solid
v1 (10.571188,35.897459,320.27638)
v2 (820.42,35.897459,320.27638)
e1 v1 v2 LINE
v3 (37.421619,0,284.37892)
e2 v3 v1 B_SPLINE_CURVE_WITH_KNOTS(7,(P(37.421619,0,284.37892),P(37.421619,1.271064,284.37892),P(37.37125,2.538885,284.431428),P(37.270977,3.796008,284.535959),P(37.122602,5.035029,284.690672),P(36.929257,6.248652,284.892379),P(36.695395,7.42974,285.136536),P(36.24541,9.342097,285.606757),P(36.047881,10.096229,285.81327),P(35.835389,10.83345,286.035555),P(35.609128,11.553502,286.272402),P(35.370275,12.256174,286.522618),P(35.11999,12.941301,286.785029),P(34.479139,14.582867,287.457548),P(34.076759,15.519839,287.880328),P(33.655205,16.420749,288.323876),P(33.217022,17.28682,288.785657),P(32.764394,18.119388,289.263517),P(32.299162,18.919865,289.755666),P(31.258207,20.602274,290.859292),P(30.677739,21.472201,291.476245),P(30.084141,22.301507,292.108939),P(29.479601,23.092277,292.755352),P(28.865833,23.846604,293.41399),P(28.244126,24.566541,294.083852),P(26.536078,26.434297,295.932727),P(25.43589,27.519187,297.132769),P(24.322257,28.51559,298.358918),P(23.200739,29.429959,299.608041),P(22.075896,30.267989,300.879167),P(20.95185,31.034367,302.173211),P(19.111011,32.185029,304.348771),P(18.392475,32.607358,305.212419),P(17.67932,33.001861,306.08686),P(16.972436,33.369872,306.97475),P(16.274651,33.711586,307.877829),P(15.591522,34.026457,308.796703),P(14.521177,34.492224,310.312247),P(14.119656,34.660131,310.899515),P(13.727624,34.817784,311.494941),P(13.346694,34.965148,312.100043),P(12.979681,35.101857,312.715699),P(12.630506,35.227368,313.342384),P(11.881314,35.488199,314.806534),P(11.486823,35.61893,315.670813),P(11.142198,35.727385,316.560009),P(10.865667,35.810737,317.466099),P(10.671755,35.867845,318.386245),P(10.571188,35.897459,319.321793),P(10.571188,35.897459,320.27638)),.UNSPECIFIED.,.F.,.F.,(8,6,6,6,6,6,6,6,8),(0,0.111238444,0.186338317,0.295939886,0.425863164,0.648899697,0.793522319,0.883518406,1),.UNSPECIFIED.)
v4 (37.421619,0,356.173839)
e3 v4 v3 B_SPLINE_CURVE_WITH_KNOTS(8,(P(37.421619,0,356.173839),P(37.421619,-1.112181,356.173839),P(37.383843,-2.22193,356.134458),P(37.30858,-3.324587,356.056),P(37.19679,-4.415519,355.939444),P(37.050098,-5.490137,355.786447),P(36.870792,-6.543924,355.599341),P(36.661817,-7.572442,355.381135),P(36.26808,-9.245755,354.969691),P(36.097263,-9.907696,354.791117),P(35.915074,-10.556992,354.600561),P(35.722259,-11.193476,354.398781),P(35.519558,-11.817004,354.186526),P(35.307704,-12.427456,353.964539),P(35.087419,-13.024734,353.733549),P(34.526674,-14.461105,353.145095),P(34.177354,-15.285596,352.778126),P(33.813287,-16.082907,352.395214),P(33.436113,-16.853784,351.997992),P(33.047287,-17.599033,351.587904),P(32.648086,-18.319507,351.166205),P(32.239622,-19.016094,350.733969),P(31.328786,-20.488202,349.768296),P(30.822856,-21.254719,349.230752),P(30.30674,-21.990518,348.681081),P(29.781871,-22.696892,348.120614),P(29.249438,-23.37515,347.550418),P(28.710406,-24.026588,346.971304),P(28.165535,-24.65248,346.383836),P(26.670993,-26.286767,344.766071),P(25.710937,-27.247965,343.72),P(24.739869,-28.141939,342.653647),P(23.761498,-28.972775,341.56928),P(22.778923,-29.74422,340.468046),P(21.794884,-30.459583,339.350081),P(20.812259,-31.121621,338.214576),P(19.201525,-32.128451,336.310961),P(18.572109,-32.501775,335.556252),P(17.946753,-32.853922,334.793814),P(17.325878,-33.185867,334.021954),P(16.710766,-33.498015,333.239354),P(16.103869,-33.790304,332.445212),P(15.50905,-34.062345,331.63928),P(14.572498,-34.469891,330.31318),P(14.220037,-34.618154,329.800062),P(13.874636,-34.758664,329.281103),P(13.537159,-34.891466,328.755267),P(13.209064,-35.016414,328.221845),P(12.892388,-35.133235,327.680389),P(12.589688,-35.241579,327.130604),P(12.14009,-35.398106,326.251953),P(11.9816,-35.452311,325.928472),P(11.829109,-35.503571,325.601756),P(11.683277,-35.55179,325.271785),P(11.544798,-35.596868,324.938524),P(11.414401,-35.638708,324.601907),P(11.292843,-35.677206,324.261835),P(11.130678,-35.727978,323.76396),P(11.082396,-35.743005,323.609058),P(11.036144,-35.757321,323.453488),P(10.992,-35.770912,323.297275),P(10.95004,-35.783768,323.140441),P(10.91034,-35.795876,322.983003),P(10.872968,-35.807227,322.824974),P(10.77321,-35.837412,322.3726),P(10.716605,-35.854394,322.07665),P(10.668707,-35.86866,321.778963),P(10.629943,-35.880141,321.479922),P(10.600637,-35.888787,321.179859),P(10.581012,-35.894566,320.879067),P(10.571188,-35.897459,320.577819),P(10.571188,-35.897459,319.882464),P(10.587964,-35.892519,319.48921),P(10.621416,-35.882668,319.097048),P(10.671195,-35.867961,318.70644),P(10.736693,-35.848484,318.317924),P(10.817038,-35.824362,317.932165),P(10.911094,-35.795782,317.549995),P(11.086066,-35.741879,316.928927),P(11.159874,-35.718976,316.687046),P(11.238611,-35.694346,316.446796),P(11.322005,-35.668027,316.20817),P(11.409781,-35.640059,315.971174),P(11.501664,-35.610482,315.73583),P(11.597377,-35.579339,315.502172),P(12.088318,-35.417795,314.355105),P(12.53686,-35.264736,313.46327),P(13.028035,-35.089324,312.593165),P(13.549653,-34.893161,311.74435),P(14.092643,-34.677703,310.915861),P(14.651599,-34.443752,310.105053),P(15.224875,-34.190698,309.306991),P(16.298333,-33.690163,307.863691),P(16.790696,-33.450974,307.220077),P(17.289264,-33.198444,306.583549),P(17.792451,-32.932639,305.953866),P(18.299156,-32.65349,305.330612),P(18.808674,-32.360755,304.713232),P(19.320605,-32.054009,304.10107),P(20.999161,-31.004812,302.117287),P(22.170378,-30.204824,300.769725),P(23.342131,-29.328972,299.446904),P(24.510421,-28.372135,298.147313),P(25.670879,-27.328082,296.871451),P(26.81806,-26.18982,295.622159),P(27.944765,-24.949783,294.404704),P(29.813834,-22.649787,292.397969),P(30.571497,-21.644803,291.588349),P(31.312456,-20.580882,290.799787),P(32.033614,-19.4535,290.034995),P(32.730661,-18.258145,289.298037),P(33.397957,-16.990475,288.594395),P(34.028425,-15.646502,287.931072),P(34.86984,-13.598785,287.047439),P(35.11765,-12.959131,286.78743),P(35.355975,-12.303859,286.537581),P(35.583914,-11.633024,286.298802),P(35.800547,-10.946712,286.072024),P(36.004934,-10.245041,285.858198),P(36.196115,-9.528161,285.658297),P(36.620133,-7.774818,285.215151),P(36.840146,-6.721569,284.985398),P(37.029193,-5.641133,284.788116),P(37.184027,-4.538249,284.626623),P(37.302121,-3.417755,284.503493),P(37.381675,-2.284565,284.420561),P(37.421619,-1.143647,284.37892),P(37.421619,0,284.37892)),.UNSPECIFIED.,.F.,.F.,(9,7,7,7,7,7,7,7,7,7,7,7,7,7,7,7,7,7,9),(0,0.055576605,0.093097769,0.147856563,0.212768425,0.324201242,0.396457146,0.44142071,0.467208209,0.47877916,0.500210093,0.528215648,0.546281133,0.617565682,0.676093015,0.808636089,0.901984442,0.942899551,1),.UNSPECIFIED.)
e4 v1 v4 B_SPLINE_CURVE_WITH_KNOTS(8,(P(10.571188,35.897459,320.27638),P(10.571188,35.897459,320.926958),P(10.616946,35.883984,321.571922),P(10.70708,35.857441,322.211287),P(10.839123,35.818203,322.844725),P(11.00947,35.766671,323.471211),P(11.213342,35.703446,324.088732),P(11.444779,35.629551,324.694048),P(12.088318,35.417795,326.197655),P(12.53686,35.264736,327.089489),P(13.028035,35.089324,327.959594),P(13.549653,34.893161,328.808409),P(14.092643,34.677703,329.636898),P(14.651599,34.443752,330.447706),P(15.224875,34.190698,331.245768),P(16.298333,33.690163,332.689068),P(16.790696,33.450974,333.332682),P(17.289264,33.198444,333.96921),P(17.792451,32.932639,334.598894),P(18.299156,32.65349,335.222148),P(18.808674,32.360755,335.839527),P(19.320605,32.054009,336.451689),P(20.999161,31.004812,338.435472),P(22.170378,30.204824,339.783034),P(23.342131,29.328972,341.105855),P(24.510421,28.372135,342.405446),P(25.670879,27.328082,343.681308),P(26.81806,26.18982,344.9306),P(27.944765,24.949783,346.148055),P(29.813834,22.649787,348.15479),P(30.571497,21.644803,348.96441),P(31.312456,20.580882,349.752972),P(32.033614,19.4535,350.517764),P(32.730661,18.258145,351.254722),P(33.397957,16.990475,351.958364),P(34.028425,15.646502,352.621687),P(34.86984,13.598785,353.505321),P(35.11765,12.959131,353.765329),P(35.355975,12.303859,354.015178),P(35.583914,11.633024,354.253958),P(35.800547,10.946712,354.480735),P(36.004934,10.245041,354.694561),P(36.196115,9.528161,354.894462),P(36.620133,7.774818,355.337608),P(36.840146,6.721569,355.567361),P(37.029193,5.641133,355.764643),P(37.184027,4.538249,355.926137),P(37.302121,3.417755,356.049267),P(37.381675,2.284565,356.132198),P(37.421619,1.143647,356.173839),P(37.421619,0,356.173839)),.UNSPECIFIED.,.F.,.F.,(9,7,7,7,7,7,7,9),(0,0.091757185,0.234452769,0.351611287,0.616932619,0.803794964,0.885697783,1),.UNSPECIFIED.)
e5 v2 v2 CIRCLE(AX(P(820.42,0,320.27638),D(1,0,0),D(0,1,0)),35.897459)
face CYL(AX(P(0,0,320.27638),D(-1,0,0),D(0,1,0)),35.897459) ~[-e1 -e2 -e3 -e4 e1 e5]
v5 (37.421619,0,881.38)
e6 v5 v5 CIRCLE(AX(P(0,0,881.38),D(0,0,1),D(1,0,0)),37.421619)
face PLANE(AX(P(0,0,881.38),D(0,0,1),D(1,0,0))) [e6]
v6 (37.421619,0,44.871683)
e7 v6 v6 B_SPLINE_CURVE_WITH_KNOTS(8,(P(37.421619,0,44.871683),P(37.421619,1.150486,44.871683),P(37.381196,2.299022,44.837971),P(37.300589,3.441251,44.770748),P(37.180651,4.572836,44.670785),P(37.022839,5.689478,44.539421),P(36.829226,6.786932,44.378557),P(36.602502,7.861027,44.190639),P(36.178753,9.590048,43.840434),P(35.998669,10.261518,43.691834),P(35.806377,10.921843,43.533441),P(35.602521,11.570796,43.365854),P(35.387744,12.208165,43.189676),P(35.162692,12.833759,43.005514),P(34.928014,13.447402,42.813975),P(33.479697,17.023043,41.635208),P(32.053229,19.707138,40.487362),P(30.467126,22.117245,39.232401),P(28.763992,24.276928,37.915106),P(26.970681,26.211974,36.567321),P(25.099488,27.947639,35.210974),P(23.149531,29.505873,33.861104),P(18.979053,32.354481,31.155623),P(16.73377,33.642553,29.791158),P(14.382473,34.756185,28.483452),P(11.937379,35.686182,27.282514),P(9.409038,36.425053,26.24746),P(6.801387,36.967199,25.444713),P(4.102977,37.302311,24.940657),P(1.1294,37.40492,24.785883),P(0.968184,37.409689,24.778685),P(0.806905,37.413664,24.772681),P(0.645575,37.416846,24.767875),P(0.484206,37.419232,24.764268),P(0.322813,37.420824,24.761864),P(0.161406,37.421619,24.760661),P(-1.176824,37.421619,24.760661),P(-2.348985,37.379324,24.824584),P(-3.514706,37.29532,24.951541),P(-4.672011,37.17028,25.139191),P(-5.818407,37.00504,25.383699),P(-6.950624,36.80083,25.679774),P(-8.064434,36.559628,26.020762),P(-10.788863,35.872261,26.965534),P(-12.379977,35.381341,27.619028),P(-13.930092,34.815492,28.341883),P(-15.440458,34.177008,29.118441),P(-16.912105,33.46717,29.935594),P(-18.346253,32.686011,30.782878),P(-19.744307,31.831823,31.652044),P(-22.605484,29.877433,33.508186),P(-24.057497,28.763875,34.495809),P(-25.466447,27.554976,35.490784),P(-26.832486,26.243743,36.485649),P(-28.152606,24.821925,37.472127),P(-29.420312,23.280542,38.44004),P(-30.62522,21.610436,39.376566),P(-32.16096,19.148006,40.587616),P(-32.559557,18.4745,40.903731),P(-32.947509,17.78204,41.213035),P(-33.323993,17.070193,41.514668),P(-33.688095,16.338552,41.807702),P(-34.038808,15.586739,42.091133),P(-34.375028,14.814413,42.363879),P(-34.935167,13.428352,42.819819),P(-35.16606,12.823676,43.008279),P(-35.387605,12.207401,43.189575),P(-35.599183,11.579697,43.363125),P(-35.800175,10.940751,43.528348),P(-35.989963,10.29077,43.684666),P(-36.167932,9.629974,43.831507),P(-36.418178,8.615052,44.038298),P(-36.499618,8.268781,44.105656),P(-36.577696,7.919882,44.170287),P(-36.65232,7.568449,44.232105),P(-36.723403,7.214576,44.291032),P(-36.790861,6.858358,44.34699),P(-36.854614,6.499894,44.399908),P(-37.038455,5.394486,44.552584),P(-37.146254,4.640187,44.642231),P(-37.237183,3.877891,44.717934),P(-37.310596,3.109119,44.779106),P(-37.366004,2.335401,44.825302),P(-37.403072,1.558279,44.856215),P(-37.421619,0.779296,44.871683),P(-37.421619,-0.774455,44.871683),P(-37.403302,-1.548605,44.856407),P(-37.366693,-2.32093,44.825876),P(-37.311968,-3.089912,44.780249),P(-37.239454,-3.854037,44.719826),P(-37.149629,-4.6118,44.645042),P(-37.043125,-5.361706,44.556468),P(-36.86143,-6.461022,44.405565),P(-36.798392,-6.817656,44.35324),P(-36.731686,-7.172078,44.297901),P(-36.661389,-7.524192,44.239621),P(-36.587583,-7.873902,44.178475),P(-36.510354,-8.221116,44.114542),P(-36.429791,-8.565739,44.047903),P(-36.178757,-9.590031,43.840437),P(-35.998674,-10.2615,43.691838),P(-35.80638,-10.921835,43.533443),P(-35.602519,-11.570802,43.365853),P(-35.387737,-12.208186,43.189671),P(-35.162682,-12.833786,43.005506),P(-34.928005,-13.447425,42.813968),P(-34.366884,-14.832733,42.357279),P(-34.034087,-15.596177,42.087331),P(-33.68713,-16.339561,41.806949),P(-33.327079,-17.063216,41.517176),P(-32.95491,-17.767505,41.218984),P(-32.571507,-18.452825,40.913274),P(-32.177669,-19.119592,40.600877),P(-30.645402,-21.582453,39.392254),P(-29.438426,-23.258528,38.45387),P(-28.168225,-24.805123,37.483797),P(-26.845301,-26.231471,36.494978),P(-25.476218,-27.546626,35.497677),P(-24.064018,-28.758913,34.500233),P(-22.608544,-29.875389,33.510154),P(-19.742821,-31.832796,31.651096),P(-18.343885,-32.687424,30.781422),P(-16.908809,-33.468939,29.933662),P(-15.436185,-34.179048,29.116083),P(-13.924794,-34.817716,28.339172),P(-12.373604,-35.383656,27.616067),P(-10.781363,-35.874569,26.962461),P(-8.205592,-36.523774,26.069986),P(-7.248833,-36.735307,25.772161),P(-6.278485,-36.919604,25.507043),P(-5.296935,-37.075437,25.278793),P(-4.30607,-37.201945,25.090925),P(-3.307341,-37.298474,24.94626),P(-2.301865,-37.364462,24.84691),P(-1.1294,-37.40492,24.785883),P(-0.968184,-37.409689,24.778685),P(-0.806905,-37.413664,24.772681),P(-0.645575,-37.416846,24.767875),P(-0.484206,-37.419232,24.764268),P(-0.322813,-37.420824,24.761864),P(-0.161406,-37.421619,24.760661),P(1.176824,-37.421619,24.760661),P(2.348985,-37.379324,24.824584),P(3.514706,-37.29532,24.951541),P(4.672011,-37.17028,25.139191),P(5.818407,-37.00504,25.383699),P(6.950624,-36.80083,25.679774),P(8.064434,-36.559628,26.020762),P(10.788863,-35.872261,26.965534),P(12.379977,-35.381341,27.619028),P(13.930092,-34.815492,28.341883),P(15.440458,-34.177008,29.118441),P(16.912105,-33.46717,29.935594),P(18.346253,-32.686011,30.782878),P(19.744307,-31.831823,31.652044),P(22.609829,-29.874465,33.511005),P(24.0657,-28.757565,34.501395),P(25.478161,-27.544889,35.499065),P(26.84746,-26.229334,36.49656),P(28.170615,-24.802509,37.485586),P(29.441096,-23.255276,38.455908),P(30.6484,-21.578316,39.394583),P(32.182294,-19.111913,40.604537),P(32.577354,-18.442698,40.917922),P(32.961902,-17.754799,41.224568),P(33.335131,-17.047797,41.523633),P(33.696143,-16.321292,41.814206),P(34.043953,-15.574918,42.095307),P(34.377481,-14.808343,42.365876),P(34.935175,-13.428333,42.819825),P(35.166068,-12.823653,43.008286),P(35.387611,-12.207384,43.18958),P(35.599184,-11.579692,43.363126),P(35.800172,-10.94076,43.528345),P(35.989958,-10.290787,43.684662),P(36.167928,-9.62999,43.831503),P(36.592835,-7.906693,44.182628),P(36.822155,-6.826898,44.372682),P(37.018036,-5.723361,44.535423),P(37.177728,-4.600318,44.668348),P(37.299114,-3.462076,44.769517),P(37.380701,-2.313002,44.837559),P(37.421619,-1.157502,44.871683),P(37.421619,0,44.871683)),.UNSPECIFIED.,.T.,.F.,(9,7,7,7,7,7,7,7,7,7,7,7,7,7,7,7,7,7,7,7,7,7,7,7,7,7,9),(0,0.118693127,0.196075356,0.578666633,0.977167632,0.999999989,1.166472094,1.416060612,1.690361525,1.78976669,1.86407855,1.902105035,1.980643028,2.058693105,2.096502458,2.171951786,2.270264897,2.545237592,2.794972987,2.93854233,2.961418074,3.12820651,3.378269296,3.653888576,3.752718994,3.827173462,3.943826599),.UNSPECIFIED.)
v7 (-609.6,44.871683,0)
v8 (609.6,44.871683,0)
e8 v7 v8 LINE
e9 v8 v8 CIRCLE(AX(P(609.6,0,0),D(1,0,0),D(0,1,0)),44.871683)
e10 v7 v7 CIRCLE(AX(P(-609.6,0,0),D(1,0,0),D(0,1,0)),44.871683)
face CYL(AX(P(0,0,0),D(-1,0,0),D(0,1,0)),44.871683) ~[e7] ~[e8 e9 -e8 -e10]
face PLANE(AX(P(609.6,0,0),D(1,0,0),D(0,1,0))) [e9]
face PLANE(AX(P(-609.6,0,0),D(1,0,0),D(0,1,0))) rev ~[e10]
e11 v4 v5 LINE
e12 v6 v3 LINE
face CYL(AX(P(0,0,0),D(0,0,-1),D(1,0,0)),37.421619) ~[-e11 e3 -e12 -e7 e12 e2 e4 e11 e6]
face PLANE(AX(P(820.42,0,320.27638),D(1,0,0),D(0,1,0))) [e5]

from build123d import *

# Parameters (mm, degrees)
F0_R          = 23.1250603282
F1_DEPTH      = 711.2
F2_R          = 44.8716829259
F3_DEPTH      = 609.6
F3_DEPTH_BACK = 609.6
F4_R          = 37.4216193061
F5_DEPTH      = 881.38
F8_R          = 35.8974591154
F9_DEPTH      = 820.42


# Not quite as in the source:
# - a feature of the source that left no trace in its solid (it failed there, or was rolled back) is left out


with BuildPart() as f1:
    # F0 (on Top) → F1 (new body)
    with BuildSketch(Plane.XY):
        Circle(F0_R)
    extrude(amount=F1_DEPTH)

    # F2 (on Right) → F3 (join, two sides)
    with BuildSketch(Plane.YZ) as f3_sk:
        Circle(F2_R)
    extrude(amount=F3_DEPTH)
    extrude(f3_sk.sketch, amount=-F3_DEPTH_BACK)

    # F4 (on Top) → F5 (join)
    with BuildSketch(Plane.XY):
        Circle(F4_R)
    extrude(amount=F5_DEPTH)

    # F8 (on Right) → F9 (join)
    with BuildSketch(Plane.YZ):
        with Locations((0, 320.2763795853)):
            Circle(F8_R)
    extrude(amount=F9_DEPTH)


solid = f1.part
